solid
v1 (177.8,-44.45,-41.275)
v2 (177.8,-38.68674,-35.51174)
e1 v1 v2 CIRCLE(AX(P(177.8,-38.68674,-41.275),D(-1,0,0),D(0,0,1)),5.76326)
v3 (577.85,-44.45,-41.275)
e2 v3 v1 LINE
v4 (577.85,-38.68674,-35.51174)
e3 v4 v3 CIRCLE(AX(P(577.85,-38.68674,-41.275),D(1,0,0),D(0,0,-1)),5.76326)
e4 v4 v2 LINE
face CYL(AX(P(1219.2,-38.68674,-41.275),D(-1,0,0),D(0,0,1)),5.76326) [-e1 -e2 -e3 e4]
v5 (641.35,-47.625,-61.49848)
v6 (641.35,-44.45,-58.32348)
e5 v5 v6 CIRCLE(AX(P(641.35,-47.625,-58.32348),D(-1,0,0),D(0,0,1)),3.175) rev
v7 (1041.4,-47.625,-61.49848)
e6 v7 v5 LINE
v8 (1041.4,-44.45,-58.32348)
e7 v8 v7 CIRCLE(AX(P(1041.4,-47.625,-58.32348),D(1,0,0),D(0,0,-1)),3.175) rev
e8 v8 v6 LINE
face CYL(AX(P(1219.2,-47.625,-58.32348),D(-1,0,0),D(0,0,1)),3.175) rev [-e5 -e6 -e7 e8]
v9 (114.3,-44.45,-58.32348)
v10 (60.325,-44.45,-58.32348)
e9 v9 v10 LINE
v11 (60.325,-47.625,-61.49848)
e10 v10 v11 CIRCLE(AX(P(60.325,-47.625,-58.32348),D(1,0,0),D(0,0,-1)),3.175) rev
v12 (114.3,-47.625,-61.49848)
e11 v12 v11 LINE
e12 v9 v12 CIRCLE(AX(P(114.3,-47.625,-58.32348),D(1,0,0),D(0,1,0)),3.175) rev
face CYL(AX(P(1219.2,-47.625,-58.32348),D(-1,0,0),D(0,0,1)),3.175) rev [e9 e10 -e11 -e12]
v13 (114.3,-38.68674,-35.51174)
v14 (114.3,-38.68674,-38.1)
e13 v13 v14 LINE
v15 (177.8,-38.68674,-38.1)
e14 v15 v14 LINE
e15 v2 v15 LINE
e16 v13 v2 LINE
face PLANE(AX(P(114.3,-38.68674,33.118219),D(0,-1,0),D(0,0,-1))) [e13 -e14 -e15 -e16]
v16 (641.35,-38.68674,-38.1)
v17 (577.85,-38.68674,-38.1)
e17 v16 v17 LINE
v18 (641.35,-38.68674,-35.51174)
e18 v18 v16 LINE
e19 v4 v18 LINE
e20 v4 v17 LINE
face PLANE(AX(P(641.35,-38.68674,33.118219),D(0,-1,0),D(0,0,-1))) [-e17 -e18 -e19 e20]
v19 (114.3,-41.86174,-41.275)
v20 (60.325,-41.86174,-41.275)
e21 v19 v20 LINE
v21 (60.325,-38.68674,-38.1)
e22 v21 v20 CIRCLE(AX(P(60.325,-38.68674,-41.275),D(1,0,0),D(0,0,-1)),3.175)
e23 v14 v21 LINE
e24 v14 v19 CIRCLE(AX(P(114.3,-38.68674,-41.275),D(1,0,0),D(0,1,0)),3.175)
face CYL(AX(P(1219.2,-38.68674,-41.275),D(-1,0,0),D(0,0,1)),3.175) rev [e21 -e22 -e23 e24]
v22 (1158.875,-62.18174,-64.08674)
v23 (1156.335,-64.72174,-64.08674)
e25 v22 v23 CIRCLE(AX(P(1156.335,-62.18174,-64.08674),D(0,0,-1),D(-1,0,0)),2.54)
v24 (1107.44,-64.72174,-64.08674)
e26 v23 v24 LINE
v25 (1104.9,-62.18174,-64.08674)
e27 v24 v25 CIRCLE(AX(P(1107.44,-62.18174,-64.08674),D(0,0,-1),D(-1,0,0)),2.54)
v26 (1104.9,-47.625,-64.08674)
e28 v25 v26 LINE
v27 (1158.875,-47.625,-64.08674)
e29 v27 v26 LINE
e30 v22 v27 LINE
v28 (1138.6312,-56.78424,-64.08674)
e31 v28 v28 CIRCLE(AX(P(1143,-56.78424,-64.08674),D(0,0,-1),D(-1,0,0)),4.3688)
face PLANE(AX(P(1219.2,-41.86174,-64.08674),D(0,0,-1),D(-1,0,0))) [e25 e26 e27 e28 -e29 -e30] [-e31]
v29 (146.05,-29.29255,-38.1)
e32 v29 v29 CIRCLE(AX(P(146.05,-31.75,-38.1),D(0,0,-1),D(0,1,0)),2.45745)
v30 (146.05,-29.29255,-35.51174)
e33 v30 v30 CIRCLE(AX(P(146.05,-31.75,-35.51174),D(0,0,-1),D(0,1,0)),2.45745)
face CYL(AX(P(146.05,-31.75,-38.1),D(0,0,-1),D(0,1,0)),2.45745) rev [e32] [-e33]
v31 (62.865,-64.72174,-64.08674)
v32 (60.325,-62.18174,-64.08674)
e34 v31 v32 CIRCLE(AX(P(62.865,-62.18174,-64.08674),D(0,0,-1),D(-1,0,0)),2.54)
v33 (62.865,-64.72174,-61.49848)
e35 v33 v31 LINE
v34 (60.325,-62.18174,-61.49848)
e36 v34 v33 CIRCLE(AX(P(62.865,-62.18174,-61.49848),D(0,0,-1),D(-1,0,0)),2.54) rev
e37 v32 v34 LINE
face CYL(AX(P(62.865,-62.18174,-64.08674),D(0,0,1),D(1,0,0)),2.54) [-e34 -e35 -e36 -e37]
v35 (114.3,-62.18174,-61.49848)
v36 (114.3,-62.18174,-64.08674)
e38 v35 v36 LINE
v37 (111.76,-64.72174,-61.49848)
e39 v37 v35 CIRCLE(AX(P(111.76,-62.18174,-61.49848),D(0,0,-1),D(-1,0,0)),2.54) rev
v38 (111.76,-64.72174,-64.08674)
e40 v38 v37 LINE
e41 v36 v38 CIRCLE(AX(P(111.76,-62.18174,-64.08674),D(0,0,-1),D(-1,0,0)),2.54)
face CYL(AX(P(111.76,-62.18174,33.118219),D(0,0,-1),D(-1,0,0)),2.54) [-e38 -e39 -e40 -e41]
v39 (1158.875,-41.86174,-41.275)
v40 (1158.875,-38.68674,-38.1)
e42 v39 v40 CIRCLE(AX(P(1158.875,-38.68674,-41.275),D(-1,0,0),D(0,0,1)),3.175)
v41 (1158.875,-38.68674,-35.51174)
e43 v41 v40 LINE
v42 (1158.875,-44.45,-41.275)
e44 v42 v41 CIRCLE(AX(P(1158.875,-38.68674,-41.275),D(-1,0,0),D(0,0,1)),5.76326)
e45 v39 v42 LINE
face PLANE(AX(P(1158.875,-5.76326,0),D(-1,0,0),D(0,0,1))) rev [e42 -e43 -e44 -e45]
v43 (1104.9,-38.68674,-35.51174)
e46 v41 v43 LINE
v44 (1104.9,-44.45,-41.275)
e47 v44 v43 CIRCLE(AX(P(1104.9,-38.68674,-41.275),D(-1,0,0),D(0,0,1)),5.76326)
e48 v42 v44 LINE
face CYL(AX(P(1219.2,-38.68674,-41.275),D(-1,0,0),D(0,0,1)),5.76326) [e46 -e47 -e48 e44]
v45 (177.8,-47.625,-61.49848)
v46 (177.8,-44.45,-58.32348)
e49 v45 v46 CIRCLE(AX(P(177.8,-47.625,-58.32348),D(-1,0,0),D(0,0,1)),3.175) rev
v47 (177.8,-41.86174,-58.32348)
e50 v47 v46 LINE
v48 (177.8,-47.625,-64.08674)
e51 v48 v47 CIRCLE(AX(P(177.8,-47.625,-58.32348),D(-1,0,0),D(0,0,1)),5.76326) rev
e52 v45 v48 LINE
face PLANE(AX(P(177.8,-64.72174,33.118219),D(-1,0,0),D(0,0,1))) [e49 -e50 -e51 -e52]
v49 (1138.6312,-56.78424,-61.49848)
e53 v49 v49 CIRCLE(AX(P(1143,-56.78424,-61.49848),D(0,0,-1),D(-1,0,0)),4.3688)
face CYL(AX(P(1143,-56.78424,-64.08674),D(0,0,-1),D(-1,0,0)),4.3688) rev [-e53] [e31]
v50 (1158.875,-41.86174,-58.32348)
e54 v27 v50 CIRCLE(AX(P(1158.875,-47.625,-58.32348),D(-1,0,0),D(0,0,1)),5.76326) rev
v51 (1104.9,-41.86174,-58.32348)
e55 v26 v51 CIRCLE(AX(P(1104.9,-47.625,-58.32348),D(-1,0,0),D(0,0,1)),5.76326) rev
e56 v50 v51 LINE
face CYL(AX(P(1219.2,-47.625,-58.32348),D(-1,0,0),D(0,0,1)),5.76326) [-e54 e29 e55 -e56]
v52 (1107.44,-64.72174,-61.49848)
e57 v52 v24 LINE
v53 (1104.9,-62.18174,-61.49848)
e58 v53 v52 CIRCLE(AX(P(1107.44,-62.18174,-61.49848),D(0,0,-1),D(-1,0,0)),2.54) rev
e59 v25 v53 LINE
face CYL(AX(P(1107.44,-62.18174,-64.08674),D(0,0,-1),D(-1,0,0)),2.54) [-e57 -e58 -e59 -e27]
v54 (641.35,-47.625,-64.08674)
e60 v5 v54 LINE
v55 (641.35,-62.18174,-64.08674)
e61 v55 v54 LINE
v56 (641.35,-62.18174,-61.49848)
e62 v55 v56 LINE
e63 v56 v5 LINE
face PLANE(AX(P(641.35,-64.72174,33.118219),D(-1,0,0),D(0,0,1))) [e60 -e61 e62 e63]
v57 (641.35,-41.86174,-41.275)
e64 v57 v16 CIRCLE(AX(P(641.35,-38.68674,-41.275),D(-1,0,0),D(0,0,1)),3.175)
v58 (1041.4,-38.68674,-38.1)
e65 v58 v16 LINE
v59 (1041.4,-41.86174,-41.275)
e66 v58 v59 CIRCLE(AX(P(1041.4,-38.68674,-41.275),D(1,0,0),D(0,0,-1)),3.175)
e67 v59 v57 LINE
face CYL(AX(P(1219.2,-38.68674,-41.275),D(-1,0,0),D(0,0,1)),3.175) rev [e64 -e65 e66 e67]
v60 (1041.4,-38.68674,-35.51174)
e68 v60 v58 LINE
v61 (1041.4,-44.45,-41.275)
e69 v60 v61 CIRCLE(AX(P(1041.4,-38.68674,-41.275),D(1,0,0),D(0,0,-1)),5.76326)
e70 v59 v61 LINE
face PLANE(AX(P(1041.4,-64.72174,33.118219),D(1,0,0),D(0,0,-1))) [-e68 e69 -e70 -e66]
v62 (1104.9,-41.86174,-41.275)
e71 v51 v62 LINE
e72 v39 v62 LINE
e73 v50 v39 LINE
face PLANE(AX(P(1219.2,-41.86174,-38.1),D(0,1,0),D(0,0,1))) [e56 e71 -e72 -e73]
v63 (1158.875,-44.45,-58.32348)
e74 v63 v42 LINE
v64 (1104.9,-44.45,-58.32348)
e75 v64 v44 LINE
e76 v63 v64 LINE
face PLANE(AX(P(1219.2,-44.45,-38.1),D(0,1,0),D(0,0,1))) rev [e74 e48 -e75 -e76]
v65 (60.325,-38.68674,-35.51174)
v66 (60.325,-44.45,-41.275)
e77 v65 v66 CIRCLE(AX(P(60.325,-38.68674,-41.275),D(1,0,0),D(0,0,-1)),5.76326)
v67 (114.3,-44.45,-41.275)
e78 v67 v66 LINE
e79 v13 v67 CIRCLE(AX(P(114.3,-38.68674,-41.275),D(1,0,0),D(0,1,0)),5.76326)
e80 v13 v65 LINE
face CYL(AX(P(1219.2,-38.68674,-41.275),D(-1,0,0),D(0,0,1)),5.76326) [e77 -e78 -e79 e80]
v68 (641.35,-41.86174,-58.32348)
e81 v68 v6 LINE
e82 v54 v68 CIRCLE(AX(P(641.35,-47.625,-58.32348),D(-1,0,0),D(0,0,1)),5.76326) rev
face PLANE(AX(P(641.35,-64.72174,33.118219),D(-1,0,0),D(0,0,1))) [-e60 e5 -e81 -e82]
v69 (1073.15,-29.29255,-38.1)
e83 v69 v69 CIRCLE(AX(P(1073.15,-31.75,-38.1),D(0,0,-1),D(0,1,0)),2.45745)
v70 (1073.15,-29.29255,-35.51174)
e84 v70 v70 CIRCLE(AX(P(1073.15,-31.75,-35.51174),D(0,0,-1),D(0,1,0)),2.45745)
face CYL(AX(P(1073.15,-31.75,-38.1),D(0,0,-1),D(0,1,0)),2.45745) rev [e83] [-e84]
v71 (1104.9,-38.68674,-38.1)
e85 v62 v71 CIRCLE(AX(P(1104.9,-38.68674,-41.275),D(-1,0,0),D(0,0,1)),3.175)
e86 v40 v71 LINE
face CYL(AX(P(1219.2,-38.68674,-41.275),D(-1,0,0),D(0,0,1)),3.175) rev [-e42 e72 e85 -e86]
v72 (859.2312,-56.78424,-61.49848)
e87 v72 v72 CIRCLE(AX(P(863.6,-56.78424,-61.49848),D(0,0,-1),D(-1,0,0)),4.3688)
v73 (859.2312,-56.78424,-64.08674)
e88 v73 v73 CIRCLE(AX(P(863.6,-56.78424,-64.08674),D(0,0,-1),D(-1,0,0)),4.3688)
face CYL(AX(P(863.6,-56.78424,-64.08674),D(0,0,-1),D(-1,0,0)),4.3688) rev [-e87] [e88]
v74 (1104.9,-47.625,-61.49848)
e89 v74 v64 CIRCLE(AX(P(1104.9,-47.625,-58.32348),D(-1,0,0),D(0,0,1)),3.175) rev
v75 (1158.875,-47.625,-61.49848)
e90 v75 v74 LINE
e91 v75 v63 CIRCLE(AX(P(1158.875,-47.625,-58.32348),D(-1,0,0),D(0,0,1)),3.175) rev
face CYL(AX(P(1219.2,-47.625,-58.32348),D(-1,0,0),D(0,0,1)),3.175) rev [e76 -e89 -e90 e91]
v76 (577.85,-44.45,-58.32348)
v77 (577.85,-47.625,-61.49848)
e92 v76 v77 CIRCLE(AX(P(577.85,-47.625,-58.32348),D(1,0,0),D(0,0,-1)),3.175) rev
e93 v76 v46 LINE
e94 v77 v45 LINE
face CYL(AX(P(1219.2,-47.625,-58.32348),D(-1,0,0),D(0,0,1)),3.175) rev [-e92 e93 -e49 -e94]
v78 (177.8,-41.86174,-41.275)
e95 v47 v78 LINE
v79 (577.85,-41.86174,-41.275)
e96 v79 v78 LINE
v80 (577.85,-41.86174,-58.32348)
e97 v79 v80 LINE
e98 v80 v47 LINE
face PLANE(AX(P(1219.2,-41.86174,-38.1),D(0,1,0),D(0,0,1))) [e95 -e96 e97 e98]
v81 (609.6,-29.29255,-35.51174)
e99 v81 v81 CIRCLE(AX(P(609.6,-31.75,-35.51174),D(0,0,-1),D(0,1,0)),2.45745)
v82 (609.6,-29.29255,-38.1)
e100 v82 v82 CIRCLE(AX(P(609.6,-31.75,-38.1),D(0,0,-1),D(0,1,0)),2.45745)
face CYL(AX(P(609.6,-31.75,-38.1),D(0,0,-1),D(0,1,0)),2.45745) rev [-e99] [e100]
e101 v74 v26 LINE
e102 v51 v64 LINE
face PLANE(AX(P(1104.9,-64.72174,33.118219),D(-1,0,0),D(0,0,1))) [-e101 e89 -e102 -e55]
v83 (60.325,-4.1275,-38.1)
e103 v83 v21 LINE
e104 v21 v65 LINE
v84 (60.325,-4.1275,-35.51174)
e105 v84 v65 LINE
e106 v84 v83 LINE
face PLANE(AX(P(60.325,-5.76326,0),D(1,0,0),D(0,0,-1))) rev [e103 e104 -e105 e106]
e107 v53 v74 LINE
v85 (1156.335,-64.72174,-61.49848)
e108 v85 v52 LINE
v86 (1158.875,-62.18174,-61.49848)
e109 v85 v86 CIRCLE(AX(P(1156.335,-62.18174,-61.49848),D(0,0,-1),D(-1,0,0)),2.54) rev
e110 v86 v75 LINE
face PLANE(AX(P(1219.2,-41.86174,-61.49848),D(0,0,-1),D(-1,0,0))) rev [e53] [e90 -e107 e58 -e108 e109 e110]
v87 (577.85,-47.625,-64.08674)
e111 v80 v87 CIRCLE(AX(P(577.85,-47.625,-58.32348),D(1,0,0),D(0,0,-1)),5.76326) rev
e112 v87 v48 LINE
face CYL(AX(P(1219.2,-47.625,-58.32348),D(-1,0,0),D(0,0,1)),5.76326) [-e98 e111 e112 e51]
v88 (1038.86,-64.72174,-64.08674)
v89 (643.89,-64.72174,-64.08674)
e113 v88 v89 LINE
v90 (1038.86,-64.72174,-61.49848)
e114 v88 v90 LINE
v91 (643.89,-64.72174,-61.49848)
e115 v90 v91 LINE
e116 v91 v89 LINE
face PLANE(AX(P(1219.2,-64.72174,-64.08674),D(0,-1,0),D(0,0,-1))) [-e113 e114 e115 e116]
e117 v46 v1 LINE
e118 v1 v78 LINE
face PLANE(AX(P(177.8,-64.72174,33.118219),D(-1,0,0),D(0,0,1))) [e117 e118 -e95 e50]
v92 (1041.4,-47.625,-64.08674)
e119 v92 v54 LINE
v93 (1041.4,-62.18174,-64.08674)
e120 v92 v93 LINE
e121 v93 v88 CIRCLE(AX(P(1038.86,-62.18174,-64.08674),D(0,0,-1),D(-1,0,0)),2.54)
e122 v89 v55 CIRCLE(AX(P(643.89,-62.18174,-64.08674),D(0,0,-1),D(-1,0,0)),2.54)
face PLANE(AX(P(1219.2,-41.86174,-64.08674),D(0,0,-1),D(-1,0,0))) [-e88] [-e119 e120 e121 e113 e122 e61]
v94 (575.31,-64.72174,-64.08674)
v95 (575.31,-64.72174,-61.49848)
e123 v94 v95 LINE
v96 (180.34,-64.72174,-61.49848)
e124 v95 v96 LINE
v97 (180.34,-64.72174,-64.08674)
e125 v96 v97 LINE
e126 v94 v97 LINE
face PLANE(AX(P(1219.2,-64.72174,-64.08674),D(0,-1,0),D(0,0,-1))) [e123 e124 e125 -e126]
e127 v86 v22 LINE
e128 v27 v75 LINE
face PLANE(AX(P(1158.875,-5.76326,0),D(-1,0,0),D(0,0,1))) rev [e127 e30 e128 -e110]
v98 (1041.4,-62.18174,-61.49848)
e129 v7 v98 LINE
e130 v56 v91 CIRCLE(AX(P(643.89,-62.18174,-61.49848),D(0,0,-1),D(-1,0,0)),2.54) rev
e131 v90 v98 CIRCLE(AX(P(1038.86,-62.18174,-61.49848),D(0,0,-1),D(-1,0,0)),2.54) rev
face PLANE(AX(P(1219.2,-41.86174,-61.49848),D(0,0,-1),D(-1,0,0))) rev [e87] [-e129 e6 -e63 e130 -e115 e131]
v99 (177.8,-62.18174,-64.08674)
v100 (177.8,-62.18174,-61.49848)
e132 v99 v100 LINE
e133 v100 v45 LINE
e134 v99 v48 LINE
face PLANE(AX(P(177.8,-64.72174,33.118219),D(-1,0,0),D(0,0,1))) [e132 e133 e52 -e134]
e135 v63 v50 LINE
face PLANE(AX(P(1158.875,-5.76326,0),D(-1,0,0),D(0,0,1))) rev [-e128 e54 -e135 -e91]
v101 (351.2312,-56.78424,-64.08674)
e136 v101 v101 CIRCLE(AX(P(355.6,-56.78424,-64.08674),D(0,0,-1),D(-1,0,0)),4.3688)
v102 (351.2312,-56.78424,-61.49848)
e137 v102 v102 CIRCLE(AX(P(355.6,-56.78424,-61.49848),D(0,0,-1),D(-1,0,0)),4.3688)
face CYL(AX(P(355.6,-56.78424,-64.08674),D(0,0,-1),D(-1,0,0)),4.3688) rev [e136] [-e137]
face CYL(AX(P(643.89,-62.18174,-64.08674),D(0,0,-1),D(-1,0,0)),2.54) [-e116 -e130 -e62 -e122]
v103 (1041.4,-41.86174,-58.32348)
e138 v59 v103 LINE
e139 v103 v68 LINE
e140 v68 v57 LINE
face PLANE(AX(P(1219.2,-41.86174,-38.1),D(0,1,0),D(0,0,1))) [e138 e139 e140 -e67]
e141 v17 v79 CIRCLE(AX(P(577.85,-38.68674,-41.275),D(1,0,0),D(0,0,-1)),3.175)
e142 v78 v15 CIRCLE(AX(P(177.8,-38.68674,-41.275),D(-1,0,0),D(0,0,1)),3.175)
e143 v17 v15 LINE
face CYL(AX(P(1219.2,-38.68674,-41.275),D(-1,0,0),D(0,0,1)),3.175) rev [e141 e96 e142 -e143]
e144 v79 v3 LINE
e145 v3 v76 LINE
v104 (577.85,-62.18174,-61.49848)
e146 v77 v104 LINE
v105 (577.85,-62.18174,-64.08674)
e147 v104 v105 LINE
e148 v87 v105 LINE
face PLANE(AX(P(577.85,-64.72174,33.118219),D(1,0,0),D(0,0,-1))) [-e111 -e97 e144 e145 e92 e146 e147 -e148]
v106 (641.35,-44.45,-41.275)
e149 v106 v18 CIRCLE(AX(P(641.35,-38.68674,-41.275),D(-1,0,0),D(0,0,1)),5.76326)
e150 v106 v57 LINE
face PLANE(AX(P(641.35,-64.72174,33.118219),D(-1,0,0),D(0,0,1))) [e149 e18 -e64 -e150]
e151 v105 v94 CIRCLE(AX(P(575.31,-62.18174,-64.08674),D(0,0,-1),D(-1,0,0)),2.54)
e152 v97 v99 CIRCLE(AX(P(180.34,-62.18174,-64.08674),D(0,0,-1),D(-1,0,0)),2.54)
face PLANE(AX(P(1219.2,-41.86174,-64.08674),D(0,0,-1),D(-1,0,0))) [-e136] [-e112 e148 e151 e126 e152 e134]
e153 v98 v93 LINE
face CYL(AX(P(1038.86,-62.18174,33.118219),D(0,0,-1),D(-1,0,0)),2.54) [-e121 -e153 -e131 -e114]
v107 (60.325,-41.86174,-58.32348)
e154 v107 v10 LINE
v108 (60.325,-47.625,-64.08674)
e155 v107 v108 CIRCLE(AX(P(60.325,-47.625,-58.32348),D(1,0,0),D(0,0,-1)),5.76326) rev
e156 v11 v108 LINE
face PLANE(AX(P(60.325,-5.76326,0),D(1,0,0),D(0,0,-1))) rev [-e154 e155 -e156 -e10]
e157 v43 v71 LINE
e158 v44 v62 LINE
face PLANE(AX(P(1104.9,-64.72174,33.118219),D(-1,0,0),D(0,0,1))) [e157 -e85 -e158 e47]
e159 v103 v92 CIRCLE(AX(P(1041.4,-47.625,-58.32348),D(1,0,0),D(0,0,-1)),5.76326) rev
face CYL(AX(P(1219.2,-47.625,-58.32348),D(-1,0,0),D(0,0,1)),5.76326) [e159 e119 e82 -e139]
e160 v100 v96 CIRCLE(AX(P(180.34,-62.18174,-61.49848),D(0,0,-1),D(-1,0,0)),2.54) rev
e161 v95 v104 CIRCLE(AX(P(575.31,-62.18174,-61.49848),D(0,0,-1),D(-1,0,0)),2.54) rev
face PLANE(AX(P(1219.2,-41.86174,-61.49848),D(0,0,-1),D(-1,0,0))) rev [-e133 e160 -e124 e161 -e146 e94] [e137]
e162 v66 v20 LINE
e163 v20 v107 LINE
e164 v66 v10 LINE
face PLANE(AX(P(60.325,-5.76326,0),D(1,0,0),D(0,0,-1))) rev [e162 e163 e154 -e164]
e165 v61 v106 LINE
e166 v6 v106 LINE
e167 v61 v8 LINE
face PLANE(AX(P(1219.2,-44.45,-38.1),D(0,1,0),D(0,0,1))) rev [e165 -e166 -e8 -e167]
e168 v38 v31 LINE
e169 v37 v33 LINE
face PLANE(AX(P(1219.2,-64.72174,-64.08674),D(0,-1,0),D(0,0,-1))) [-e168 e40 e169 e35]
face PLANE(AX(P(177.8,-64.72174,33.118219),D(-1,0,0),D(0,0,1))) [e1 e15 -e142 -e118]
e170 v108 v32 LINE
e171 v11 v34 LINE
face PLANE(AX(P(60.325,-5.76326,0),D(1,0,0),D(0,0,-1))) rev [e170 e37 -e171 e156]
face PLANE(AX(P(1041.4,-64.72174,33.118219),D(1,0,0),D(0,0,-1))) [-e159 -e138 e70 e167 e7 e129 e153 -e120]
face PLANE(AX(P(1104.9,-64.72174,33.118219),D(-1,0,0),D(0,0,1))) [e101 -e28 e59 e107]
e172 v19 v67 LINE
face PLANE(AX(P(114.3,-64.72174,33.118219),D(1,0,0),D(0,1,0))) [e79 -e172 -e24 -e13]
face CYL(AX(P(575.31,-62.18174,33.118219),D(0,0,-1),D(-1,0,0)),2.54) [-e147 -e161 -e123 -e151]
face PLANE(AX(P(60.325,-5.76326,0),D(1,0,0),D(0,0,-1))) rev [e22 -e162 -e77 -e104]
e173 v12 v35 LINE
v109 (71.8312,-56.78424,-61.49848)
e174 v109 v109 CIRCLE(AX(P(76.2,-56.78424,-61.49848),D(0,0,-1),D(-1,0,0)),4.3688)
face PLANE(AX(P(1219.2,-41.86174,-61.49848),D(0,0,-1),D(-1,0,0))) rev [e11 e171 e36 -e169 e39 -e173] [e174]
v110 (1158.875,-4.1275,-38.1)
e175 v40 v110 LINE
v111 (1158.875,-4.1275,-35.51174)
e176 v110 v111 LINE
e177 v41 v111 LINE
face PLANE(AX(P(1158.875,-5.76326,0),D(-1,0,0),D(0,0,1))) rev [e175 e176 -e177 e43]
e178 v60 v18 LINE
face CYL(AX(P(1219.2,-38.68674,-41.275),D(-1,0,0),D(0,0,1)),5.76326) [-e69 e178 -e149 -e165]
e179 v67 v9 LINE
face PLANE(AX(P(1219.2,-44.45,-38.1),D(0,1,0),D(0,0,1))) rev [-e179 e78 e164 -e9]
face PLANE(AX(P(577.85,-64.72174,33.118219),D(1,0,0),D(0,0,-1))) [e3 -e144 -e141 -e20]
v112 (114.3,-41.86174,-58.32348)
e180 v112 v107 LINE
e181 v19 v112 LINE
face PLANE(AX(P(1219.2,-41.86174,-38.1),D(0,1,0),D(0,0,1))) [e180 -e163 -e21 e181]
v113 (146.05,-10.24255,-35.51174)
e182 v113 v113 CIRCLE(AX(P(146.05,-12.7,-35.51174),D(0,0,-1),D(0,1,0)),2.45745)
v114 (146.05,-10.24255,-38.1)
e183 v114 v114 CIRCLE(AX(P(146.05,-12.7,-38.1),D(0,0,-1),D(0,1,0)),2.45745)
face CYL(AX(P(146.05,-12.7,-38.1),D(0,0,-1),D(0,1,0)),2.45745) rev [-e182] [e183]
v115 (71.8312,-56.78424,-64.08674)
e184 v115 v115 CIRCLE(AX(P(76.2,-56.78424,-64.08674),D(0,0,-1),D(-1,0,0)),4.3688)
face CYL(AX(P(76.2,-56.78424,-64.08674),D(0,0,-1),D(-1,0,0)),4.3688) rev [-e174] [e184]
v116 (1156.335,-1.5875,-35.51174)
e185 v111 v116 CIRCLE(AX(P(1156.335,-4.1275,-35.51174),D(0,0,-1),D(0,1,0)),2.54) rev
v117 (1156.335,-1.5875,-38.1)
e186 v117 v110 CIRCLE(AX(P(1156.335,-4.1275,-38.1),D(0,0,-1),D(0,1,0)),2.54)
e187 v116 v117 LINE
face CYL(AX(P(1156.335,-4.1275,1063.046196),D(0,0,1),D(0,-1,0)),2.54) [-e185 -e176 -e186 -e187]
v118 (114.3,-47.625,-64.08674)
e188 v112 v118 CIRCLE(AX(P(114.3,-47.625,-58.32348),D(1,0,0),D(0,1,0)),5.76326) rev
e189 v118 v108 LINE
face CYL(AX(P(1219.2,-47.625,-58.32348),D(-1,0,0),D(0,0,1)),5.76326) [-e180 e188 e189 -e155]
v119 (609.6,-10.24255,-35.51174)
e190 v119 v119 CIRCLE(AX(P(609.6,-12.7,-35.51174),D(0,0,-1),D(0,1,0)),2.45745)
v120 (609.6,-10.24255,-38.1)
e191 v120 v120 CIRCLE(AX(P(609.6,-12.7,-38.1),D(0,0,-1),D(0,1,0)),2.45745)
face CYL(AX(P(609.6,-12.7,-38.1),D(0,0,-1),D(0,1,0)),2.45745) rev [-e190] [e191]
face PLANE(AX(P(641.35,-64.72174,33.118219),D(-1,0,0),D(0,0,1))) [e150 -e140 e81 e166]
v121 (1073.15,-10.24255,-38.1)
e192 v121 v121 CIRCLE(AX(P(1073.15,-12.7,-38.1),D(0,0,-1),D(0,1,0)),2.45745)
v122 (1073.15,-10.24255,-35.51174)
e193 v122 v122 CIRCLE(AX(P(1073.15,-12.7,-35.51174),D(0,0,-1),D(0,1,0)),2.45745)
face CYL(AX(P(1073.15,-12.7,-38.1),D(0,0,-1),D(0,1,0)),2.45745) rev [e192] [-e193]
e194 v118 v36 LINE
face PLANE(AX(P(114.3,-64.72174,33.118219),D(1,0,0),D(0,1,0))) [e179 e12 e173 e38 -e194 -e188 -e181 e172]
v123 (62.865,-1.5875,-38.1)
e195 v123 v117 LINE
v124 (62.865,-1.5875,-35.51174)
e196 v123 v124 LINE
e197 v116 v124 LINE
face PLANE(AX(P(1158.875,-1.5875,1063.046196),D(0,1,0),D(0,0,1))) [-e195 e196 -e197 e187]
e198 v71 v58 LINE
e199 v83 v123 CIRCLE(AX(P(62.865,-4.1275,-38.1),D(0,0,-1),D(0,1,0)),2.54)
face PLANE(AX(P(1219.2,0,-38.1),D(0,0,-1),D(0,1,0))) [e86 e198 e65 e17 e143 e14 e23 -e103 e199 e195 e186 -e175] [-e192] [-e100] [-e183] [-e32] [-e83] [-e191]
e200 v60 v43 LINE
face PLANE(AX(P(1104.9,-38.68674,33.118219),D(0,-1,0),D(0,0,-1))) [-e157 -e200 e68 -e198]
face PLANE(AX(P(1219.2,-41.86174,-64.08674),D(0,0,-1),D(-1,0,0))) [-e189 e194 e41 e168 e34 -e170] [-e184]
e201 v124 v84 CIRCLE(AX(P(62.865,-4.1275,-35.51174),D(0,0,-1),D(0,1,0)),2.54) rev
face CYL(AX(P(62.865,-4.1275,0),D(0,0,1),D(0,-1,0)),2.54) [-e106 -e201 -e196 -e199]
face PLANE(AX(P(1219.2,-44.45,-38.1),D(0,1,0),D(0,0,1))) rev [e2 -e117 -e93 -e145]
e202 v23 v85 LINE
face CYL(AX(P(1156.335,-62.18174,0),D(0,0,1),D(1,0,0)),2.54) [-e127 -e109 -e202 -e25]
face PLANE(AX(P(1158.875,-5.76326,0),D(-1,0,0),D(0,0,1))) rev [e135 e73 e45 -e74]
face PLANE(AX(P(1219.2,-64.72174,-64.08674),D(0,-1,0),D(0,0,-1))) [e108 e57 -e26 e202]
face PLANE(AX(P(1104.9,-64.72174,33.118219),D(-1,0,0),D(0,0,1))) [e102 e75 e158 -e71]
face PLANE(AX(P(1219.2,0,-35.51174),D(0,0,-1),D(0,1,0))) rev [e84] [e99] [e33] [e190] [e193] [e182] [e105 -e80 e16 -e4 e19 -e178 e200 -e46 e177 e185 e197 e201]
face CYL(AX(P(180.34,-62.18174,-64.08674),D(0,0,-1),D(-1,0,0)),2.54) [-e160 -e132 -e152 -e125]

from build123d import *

# Parameters (mm, degrees)
BASE_FLANGE1_DEPTH                        = 1219.2
F_10_0_1935_DIAMETER_HOLE1_D              = 4.9149
HOLE_FOR_1_4_SELF_CLINCHING_NUTS_S_SS_C_D = 8.7376
SKETCH15_W                                = 38.1
SKETCH15_H                                = 22.86
CUT_EXTRUDE4_DEPTH                        = 5.76326
SKETCH16_W                                = 107.95
SKETCH16_H                                = 5.76326
SKETCH16_W_2                              = 171.45
CUT_EXTRUDE5_DEPTH                        = 1222.511012488
HOLE_FOR_1_4_SELF_CLINCHING_NUTS_S_2_D    = 8.7376
CUT_EXTRUDE7_REACH                        = 1224.598
SKETCH27_W                                = 63.5
SKETCH27_H                                = 26.035
SKETCH28_W                                = 60.325
SKETCH28_H                                = 58.95848
CUT_EXTRUDE8_DEPTH                        = 1223.597502808
SKETCH32_W                                = 38.1
SKETCH32_H                                = 5.76326
CUT_EXTRUDE9_DEPTH                        = 1055.864621408
SKETCH30_W                                = 1098.55
SKETCH30_H                                = 4.17576
BOSS_EXTRUDE1_DEPTH                       = 2.58826
FILLET1_R                                 = 2.54


# Read off the part's stored shape, not the designer's step: Base-Flange1
with BuildPart() as part:
    # Base-Flange1 outline → Base-Flange1 (new body)
    with BuildSketch(Plane(origin=(0, 0, 0), x_dir=(0, 0, -1), z_dir=(1, 0, 0))):
        with BuildLine():
            Line((61.49848, -47.625), (61.49848, -64.72174))
            Line((61.49848, -64.72174), (64.08674, -64.72174))
            Line((64.08674, -64.72174), (64.08674, -47.625))
            ThreePointArc((64.08674, -47.625), (62.398720228, -43.549759772), (58.32348, -41.86174))
            Line((58.32348, -41.86174), (41.275, -41.86174))
            ThreePointArc((41.275, -41.86174), (39.02993597, -40.93180403), (38.1, -38.68674))
            Line((38.1, -38.68674), (38.1, -5.76326))
            ThreePointArc((38.1, -5.76326), (36.411980228, -1.688019772), (32.33674, 0))
            Line((32.33674, 0), (0, 0))
            Line((0, 0), (0, -2.58826))
            Line((0, -2.58826), (32.33674, -2.58826))
            ThreePointArc((32.33674, -2.58826), (34.58180403, -3.51819597), (35.51174, -5.76326))
            Line((35.51174, -5.76326), (35.51174, -38.68674))
            ThreePointArc((35.51174, -38.68674), (37.199759772, -42.761980228), (41.275, -44.45))
            Line((41.275, -44.45), (58.32348, -44.45))
            ThreePointArc((58.32348, -44.45), (60.56854403, -45.37993597), (61.49848, -47.625))
        make_face()
    extrude(amount=BASE_FLANGE1_DEPTH)

    # #10 (0.1935) Diameter Hole1 (through all)
    with Locations(Plane(origin=(0, 0, -38.1), x_dir=(-1, 0, 0), z_dir=(0, 0, -1))):
        with Locations((-146.05, -12.7), (-609.6, -12.7), (-609.6, -31.75), (-1073.15, -12.7), (-1073.15, -31.75), (-146.05, -31.75)):
            Hole(F_10_0_1935_DIAMETER_HOLE1_D / 2)

    # Hole for 1_4 Self-clinching Nuts _S_SS_C (through all)
    with Locations(Plane(origin=(0, -2.58826, 0), x_dir=(-1, 0, 0), z_dir=(0, -1, 0))):
        with Locations((-304.8, 13.28674), (-914.4, 13.28674)):
            Hole(HOLE_FOR_1_4_SELF_CLINCHING_NUTS_S_SS_C_D / 2)

    # Sketch15 → Cut-Extrude4 (cut)
    with BuildSketch(Plane(origin=(0, 0, -64.08674), x_dir=(-1, 0, 0), z_dir=(0, 0, -1))):
        with Locations((-1200.15, -53.29174)):
            Rectangle(SKETCH15_W, SKETCH15_H)
        with Locations((-19.05, -53.29174)):
            Rectangle(SKETCH15_W, SKETCH15_H)
    extrude(amount=-CUT_EXTRUDE4_DEPTH, mode=Mode.SUBTRACT)

    # Sketch16 → Cut-Extrude5 (cut, through all)
    with BuildSketch(Plane(origin=(0, 0, -38.1), x_dir=(-1, 0, 0), z_dir=(0, 0, -1))):
        with Locations((-1165.225, -2.88163)):
            Rectangle(SKETCH16_W, SKETCH16_H)
        with Locations((-609.6, -2.88163)):
            Rectangle(SKETCH16_W_2, SKETCH16_H)
        with Locations((-53.975, -2.88163)):
            Rectangle(SKETCH16_W, SKETCH16_H)
    extrude(amount=-CUT_EXTRUDE5_DEPTH, mode=Mode.SUBTRACT)

    # Hole for 1_4 Self-clinching Nuts _S_ 2 (through all)
    with Locations(Plane(origin=(0, 0, -64.08674), x_dir=(-1, 0, 0), z_dir=(0, 0, -1))):
        with Locations((-1143, -56.78424), (-863.6, -56.78424), (-355.6, -56.78424), (-76.2, -56.78424)):
            Hole(HOLE_FOR_1_4_SELF_CLINCHING_NUTS_S_2_D / 2)

    # Cut-Extrude7: up to this face of the body (flat: up to its plane)
    cut_extrude7_end = Plane(part.part.faces().sort_by_distance((609.6, -22.225, -35.51174))[0])
    # Sketch27 → Cut-Extrude7 (cut, up to the picked face)
    with BuildSketch(Plane.XY.offset(-64.08674), mode=Mode.PRIVATE) as cut_extrude7_sk1:
        with Locations((146.05, -51.70424)):
            Rectangle(SKETCH27_W, SKETCH27_H)
    cut_extrude7_tool1 = split(extrude(cut_extrude7_sk1.sketch, amount=CUT_EXTRUDE7_REACH, mode=Mode.PRIVATE), bisect_by=cut_extrude7_end, keep=Keep.BOTH, mode=Mode.PRIVATE)
    # Sketch27 → Cut-Extrude7 (cut, up to the picked face)
    with BuildSketch(Plane.XY.offset(-64.08674), mode=Mode.PRIVATE) as cut_extrude7_sk2:
        with Locations((1073.15, -51.70424)):
            Rectangle(SKETCH27_W, SKETCH27_H)
    cut_extrude7_tool2 = split(extrude(cut_extrude7_sk2.sketch, amount=CUT_EXTRUDE7_REACH, mode=Mode.PRIVATE), bisect_by=cut_extrude7_end, keep=Keep.BOTH, mode=Mode.PRIVATE)
    # Sketch27 → Cut-Extrude7 (cut, up to the picked face)
    with BuildSketch(Plane.XY.offset(-64.08674), mode=Mode.PRIVATE) as cut_extrude7_sk3:
        with Locations((609.6, -51.70424)):
            Rectangle(SKETCH27_W, SKETCH27_H)
    cut_extrude7_tool3 = split(extrude(cut_extrude7_sk3.sketch, amount=CUT_EXTRUDE7_REACH, mode=Mode.PRIVATE), bisect_by=cut_extrude7_end, keep=Keep.BOTH, mode=Mode.PRIVATE)
    add(cut_extrude7_tool1.solids().sort_by(Axis((146.05, -51.70424, -64.08674), (0, 0, 1)))[0], mode=Mode.SUBTRACT)
    add(cut_extrude7_tool2.solids().sort_by(Axis((1073.15, -51.70424, -64.08674), (0, 0, 1)))[0], mode=Mode.SUBTRACT)
    add(cut_extrude7_tool3.solids().sort_by(Axis((609.6, -51.70424, -64.08674), (0, 0, 1)))[0], mode=Mode.SUBTRACT)

    # Sketch28 → Cut-Extrude8 (cut, through all)
    with BuildSketch(Plane(origin=(0, 0, -64.08674), x_dir=(-1, 0, 0), z_dir=(0, 0, -1))):
        with Locations((-1189.0375, -35.2425)):
            Rectangle(SKETCH28_W, SKETCH28_H)
        with Locations((-30.1625, -35.2425)):
            Rectangle(SKETCH28_W, SKETCH28_H)
    extrude(amount=-CUT_EXTRUDE8_DEPTH, mode=Mode.SUBTRACT)

    # Sketch32 → Cut-Extrude9 (cut, through all)
    with BuildSketch(Plane(origin=(1111.25, 0, 0), x_dir=(0, 0, -1), z_dir=(1, 0, 0))):
        with Locations((19.05, -2.88163)):
            Rectangle(SKETCH32_W, SKETCH32_H)
    extrude(amount=-CUT_EXTRUDE9_DEPTH, mode=Mode.SUBTRACT)

    # Sketch30 → Boss-Extrude1 (add)
    with BuildSketch(Plane(origin=(0, 0, -38.1), x_dir=(-1, 0, 0), z_dir=(0, 0, -1))):
        with Locations((-609.6, -3.67538)):
            Rectangle(SKETCH30_W, SKETCH30_H)
    extrude(amount=-BOSS_EXTRUDE1_DEPTH)

    # Fillet1
    fillet1_edges = [part.edges().sort_by_distance(p)[0] for p in [
        (1041.4, -64.72174, -62.79261),
        (1158.875, -1.5875, -36.80587),
        (60.325, -1.5875, -36.80587),
        (177.8, -64.72174, -62.79261),
        (60.325, -64.72174, -62.79261),
        (641.35, -64.72174, -62.79261),
        (1104.9, -64.72174, -62.79261),
        (1158.875, -64.72174, -62.79261),
        (114.3, -64.72174, -62.79261),
        (577.85, -64.72174, -62.79261),
    ]]
    fillet(fillet1_edges, radius=FILLET1_R)


solid = part.part
